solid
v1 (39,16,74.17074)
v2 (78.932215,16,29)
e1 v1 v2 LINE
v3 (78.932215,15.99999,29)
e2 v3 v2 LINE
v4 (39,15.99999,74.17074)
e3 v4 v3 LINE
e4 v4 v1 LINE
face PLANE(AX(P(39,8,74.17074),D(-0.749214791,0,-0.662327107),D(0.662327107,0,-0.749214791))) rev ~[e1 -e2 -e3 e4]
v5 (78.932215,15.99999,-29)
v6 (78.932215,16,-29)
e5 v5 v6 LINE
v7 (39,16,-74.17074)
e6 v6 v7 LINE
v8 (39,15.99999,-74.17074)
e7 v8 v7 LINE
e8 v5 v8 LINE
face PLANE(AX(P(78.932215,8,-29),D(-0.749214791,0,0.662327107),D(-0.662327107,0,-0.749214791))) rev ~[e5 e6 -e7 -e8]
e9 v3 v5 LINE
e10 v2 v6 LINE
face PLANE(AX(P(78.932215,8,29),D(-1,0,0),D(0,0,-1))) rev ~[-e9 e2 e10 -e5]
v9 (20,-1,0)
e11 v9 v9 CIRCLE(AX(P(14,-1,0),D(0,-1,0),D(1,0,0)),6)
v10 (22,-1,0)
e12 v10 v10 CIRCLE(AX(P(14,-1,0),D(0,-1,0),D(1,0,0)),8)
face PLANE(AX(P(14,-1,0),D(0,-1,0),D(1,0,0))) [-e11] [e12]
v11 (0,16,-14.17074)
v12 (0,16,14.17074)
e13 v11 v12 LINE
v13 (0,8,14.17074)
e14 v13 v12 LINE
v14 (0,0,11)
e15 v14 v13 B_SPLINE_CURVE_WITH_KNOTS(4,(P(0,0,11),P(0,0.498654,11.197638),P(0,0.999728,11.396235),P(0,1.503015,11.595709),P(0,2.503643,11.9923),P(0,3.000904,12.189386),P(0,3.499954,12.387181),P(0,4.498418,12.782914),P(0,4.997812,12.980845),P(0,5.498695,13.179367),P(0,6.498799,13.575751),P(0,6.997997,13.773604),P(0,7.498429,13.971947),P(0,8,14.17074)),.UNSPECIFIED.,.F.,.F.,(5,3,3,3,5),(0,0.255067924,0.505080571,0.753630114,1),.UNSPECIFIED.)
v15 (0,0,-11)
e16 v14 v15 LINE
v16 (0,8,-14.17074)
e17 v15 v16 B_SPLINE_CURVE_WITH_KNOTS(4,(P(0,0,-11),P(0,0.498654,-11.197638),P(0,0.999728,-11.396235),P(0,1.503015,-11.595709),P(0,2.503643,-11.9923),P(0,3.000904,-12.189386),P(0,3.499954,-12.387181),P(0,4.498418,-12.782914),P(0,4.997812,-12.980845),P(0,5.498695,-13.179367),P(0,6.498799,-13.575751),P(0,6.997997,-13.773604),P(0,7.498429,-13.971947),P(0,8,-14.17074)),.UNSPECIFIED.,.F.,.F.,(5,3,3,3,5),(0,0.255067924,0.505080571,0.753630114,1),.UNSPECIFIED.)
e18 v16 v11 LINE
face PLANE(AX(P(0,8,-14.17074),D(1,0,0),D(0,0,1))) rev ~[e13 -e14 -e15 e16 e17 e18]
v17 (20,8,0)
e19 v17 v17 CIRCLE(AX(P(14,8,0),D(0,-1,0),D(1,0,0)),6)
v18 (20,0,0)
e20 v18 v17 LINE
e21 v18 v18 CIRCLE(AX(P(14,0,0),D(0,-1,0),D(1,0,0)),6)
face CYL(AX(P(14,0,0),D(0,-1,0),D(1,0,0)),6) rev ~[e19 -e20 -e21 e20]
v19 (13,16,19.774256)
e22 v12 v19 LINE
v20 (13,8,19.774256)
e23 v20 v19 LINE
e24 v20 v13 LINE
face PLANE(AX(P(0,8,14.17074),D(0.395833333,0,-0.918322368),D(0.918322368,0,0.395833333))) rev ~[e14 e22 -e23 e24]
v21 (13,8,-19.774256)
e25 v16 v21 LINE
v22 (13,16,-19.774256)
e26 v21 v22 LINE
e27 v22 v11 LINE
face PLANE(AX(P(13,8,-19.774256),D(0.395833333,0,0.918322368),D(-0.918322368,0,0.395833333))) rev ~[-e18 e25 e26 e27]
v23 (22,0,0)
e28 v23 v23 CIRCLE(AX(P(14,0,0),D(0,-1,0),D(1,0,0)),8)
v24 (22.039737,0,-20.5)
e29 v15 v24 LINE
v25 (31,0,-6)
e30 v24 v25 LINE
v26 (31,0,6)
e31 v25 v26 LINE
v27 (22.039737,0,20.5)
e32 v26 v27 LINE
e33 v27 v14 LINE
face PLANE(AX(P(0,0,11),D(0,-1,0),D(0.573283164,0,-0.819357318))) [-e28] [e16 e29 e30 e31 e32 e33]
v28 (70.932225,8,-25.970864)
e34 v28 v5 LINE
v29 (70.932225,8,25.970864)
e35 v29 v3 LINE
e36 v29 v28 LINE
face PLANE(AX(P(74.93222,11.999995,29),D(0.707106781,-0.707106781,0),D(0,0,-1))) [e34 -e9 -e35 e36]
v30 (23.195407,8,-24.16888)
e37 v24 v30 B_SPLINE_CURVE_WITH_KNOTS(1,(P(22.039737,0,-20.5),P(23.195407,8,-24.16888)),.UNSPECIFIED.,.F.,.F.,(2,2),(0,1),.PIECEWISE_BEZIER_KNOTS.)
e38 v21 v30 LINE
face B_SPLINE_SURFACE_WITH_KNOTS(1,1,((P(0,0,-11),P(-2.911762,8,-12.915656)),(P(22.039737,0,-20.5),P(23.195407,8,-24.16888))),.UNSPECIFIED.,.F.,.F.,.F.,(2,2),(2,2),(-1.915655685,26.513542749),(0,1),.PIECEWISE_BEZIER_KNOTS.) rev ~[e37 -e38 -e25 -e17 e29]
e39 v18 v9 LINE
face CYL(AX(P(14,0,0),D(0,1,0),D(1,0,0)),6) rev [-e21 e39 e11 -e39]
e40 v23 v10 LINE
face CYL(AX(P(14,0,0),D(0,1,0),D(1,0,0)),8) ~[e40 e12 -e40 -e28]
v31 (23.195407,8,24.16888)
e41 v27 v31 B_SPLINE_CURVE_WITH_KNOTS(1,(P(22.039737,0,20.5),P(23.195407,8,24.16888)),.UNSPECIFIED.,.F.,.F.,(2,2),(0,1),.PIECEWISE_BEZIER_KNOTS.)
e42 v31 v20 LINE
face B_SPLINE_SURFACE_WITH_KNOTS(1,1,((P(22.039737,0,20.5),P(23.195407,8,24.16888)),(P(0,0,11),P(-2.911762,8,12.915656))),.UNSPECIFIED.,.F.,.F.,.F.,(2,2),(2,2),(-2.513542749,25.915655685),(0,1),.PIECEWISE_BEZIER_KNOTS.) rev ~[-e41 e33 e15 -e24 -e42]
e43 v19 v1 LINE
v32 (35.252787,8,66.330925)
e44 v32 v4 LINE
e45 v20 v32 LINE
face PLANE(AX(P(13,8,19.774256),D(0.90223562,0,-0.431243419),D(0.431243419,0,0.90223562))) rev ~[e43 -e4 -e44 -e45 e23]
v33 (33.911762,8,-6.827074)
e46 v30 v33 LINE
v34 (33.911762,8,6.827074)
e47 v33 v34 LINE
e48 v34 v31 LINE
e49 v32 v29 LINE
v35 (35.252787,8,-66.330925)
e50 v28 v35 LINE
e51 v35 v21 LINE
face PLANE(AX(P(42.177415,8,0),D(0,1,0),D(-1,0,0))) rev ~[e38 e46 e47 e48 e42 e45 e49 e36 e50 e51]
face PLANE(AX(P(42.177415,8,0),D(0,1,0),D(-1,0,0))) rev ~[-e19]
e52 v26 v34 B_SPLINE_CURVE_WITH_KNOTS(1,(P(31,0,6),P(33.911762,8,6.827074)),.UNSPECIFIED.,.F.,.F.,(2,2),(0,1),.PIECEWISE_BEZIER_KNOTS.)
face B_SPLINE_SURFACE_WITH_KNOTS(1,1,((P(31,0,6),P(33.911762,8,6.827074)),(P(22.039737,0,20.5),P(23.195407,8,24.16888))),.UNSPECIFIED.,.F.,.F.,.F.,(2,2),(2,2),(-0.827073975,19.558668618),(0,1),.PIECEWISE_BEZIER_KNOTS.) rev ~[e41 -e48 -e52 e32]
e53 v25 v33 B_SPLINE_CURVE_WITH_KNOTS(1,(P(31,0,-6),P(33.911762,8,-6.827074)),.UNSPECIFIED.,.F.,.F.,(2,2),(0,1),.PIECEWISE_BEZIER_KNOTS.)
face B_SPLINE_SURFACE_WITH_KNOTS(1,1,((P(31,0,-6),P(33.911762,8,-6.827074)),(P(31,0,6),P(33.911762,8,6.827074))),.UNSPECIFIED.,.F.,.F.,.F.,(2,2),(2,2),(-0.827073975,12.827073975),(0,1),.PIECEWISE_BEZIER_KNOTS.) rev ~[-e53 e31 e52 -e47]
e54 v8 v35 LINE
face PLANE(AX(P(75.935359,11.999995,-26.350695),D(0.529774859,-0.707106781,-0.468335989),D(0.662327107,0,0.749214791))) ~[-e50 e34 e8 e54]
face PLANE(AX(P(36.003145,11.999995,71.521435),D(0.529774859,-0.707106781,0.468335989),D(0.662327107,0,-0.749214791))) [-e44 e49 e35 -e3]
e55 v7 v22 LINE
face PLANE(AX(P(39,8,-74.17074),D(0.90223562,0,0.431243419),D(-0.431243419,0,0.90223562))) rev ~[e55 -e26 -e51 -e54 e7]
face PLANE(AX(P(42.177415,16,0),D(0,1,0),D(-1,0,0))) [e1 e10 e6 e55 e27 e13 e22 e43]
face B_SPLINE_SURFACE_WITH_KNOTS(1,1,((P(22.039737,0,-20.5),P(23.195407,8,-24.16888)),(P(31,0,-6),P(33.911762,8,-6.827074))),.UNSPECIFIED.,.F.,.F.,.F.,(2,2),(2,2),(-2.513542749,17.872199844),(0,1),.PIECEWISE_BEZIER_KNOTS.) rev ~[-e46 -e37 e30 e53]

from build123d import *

# Parameters (mm, degrees)
F1_DEPTH      = 8
F1_TAPER      = -20
F2_W          = 14.830423519
F2_H          = 54.1627034545
F3_DEPTH      = 8.0010001
F4_R          = 6
F5_DEPTH      = 8.0010001
F5_DEPTH_BACK = 77
F4_R_2        = 8
F6_DEPTH      = 1
F9_DEPTH      = 8
F10_SIZE      = 7.99999


# Not quite as in the source:
# - a fillet or chamfer is up to 0.001 mm smaller than in the source, because OpenCascade refuses the exact size
# - an extrude ends at something that could not be found from the text; its depth is read off the source's solid


with BuildPart() as f1:
    # F0 (on Front) → F1 (new body)
    with BuildSketch(Plane.XZ):
        Polygon((0, 11), (0, 0), (0, -11), (22.0397368405, -20.5), (31, -6), (31, 0), (31, 6), (22.0397368405, 20.5), align=None)
    extrude(amount=-F1_DEPTH, taper=F1_TAPER)

    # F2 (on Front) → F3 (cut, through all)
    with BuildSketch(Plane.XZ):
        with Locations((-7.4152117595, -1.4976877719)):
            Rectangle(F2_W, F2_H)
    extrude(amount=-F3_DEPTH, mode=Mode.SUBTRACT)

    # F4 (on Front) → F5 (cut, two sides)
    with BuildSketch(Plane.XZ) as f5_sk:
        with Locations((14, 0)):
            Circle(F4_R)
    extrude(amount=-F5_DEPTH, mode=Mode.SUBTRACT)
    extrude(f5_sk.sketch, amount=F5_DEPTH_BACK, mode=Mode.SUBTRACT)

    # F4 (on Front) → F6 (join)
    with BuildSketch(Plane.XZ):
        with Locations((14, 0)):
            Circle(F4_R_2)
        with Locations((14, 0)):
            Circle(F4_R, mode=Mode.SUBTRACT)
    extrude(amount=F6_DEPTH)

    # F8 (on face) → F9 (join)
    with BuildSketch(Plane(origin=(0, 8, 0), x_dir=(-1, 0, 0), z_dir=(0, 1, 0))):
        Polygon((-39, -74.1707404442), (-13, -19.7742556265), (0, -14.1707404442), (0, 14.1707404442), (-13, 19.7742556265), (-39, 74.1707404442), (-78.9322146674, 29), (-78.9322146674, -29), align=None)
    extrude(amount=F9_DEPTH)

    # F10 (size 8 in the source; OpenCascade refuses exactly that, so slightly less here)
    f10_edges = [f1.edges().sort_by_distance(p)[0] for p in [
        (58.966107, 8, 51.58537),
        (78.932215, 8, 0),
        (58.966107, 8, -51.58537),
    ]]
    chamfer(f10_edges, length=F10_SIZE)


solid = f1.part
